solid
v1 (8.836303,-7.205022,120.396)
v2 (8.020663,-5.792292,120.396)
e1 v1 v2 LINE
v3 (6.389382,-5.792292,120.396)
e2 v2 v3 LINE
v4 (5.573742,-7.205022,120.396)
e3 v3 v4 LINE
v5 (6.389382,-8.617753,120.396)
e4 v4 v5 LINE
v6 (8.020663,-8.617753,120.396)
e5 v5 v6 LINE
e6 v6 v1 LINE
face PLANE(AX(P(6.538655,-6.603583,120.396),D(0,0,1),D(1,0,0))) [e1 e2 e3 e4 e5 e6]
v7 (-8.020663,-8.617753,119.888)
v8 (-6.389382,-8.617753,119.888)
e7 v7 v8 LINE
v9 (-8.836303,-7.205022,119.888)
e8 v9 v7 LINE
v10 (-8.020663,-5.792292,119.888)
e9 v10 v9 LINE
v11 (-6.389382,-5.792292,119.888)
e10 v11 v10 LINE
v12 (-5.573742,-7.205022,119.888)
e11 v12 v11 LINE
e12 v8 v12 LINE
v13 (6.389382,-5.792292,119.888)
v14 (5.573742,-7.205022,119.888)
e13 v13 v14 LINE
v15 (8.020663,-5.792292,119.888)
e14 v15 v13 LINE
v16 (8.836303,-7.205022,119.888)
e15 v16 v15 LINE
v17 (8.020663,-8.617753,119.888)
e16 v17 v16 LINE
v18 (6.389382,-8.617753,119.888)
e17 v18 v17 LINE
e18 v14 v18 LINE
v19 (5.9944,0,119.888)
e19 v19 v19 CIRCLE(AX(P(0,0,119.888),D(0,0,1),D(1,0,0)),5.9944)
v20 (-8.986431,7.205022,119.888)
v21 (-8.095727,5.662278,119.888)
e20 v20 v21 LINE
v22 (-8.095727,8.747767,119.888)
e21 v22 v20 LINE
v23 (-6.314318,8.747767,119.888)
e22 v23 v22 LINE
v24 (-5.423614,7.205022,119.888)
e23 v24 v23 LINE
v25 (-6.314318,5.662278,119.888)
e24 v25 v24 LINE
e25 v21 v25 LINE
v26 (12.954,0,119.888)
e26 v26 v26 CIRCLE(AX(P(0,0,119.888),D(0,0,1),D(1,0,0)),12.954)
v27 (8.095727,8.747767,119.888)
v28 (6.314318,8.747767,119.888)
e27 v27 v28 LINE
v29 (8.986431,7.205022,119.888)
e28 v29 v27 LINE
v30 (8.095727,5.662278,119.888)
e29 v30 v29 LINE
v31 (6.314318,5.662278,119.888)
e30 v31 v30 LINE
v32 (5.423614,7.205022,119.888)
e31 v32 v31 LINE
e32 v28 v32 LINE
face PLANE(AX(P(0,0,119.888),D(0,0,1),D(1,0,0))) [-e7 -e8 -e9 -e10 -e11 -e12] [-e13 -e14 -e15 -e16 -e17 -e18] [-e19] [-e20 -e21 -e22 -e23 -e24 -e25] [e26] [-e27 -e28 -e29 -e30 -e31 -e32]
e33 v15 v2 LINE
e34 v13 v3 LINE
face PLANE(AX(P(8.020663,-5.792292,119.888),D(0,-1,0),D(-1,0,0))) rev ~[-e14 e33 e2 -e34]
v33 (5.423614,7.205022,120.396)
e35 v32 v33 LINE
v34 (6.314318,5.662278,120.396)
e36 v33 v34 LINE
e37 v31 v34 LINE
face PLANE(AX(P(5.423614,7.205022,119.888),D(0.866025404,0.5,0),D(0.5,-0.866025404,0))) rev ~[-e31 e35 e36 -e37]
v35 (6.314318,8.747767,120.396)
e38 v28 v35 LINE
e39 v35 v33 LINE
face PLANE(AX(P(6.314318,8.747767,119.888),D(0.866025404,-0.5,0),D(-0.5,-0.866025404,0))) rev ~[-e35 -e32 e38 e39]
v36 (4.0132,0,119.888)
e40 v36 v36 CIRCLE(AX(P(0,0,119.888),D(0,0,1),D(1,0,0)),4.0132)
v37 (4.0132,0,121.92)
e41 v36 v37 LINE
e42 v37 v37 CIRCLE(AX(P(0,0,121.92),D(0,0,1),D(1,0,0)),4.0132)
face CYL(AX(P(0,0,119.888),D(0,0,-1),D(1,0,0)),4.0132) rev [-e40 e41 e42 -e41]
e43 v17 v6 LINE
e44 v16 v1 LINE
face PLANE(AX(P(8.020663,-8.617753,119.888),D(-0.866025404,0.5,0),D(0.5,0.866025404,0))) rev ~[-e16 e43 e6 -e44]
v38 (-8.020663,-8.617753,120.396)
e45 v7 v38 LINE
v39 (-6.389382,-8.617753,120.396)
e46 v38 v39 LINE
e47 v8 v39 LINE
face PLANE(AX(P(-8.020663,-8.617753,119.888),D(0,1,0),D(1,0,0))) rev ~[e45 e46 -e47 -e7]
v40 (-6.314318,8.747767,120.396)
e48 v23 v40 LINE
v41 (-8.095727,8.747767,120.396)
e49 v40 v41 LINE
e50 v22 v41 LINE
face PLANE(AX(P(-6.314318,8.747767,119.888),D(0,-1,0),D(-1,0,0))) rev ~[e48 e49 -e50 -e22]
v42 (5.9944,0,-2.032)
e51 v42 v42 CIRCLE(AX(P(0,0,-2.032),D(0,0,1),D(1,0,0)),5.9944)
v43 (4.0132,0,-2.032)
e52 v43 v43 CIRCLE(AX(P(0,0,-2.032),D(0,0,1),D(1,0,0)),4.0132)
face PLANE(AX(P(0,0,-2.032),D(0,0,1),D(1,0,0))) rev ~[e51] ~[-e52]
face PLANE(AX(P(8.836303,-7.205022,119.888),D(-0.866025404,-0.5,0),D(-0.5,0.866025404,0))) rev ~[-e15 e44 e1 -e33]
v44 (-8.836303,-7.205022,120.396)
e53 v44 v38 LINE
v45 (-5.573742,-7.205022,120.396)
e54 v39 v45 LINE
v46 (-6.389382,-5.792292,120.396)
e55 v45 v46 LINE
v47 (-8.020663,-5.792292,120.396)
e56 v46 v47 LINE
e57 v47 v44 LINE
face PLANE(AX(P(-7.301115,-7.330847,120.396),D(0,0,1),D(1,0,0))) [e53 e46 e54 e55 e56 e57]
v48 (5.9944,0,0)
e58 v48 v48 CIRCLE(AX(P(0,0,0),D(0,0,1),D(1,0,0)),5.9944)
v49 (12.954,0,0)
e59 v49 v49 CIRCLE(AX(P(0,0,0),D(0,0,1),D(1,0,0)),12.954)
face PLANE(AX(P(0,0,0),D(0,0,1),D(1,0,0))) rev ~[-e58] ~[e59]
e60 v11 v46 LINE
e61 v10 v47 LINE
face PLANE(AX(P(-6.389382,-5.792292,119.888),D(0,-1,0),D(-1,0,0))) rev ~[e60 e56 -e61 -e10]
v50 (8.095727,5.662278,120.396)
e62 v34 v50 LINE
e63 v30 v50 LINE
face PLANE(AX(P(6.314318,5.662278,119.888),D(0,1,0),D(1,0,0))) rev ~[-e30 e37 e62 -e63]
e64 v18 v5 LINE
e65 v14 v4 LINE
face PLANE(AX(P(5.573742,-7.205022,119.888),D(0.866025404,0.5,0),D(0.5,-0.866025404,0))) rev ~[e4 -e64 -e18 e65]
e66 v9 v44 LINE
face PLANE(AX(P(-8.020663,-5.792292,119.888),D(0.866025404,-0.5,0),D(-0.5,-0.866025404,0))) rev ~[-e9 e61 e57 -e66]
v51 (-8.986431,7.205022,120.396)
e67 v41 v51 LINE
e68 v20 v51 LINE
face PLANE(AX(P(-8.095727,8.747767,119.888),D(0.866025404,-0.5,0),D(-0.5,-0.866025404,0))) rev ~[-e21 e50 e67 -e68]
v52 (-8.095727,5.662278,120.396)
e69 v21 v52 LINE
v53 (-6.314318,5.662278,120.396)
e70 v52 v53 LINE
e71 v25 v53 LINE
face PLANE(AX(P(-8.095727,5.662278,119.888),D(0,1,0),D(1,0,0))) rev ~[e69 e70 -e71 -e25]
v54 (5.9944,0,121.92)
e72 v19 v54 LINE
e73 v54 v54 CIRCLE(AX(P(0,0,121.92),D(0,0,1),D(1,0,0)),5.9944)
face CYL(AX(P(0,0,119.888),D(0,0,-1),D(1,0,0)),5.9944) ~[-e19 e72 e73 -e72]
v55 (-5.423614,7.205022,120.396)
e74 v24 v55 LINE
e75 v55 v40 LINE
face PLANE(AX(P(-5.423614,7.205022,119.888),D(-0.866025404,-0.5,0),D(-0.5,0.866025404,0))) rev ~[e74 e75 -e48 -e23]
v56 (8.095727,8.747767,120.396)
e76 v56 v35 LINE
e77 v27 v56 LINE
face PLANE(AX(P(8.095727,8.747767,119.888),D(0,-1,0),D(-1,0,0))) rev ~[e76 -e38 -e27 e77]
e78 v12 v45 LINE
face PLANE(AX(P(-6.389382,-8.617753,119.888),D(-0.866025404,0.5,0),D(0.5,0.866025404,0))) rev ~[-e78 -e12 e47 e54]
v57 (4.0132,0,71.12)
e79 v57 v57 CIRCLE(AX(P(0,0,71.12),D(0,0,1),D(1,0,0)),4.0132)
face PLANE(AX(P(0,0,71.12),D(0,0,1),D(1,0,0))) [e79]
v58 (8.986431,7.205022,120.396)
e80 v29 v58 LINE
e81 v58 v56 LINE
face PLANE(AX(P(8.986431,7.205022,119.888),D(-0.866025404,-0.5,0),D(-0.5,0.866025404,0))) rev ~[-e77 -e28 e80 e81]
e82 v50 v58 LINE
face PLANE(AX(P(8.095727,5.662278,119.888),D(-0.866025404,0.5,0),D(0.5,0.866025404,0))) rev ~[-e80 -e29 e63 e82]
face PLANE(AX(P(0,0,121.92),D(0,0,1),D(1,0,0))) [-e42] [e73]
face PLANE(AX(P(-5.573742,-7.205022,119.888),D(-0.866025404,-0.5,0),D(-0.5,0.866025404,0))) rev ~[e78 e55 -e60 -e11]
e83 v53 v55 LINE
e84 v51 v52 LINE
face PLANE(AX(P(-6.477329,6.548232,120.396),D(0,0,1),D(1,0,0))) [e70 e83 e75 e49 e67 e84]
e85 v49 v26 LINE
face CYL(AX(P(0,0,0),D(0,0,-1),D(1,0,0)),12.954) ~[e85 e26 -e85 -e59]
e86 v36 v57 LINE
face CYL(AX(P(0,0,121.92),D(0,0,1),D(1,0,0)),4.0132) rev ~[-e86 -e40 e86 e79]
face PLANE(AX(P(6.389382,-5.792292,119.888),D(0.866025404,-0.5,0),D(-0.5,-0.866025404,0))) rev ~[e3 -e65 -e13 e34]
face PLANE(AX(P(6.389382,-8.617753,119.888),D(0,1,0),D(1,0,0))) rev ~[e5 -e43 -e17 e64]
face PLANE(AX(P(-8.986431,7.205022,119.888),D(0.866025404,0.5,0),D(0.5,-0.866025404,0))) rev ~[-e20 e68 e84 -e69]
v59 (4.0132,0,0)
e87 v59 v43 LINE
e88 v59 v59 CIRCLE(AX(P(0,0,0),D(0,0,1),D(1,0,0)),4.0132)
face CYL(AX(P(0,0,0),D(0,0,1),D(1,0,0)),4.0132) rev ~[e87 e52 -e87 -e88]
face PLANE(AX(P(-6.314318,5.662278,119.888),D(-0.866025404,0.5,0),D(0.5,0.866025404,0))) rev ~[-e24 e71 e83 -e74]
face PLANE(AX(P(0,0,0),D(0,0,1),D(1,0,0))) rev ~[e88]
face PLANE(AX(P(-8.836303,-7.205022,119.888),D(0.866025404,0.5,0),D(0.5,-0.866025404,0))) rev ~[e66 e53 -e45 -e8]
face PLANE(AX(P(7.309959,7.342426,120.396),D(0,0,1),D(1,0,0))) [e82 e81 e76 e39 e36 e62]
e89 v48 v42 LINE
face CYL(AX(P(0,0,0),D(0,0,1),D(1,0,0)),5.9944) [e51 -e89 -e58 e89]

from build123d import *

# Parameters (mm, degrees)
F0_R      = 12.954
F0_R_2    = 5.9944
F0_R_3    = 4.0132
F1_DEPTH  = 119.888
F2_R      = 5.9944
F2_R_2    = 4.0132
F3_DEPTH  = 2.032
F5_R      = 5.9944
F5_R_2    = 4.0132
F6_DEPTH  = 2.032
F7_R      = 4.0132
F8_DEPTH  = 50.8
F10_DEPTH = 0.508


# Not quite as in the source:
# - the program builds the solid bodies; features that only make, move or delete a surface that nothing else refers to are left out


with BuildPart() as f1:
    # F0 (on Top) → F1 (new body)
    with BuildSketch(Plane.XY):
        Circle(F0_R)
        Circle(F0_R_2, mode=Mode.SUBTRACT)
        Circle(F0_R_2)
        Circle(F0_R_3, mode=Mode.SUBTRACT)
        Circle(F0_R_3)
    extrude(amount=F1_DEPTH)

    # F2 (on face) → F3 (join)
    with BuildSketch(Plane.XY.offset(119.888)):
        Circle(F2_R)
        Circle(F2_R_2, mode=Mode.SUBTRACT)
    extrude(amount=F3_DEPTH)

    # F5 (on face) + F0 (on Top) → F6 (join)
    with BuildSketch(Plane.XY):
        Circle(F5_R)
        Circle(F5_R_2, mode=Mode.SUBTRACT)
    with BuildSketch(Plane.XY):
        Circle(F0_R_2)
        Circle(F0_R_3, mode=Mode.SUBTRACT)
    extrude(amount=-F6_DEPTH)

    # F7 (on face) → F8 (cut)
    with BuildSketch(Plane.XY.offset(121.92)):
        Circle(F7_R)
    extrude(amount=-F8_DEPTH, mode=Mode.SUBTRACT)

    # F9 (on face) → F10 (join)
    with BuildSketch(Plane.XY.offset(119.888)):
        Polygon((5.5737421783, -7.205022499), (7.205022499, -7.205022499), (7.205022499, -5.7922923006), (6.3893823387, -5.7922923006), align=None)
        Polygon((7.205022499, -5.7922923006), (7.205022499, -7.205022499), (5.5737421783, -7.205022499), (6.3893823387, -8.6177526973), (8.0206626593, -8.6177526973), (8.8363028196, -7.205022499), (8.0206626593, -5.7922923006), align=None)
        Polygon((-6.3893823387, -8.6177526973), (-5.5737421783, -7.205022499), (-7.205022499, -7.205022499), (-7.205022499, -5.7922923006), (-8.0206626593, -5.7922923006), (-8.8363028196, -7.205022499), (-8.0206626593, -8.6177526973), align=None)
        Polygon((-7.205022499, -7.205022499), (-5.5737421783, -7.205022499), (-6.3893823387, -5.7922923006), (-7.205022499, -5.7922923006), align=None)
        Polygon((-7.205022499, 7.205022499), (-7.205022499, 5.6622778066), (-6.3143184355, 5.6622778066), (-5.4236143721, 7.205022499), align=None)
        Polygon((-8.0957265624, 5.6622778066), (-7.205022499, 5.6622778066), (-7.205022499, 7.205022499), (-5.4236143721, 7.205022499), (-6.3143184355, 8.7477671914), (-8.0957265624, 8.7477671914), (-8.9864306259, 7.205022499), align=None)
        Polygon((7.205022499, 7.205022499), (7.205022499, 5.6622778066), (8.0957265624, 5.6622778066), (8.9864306259, 7.205022499), (8.0957265624, 8.7477671914), (6.3143184355, 8.7477671914), (5.4236143721, 7.205022499), align=None)
        Polygon((6.3143184355, 5.6622778066), (7.205022499, 5.6622778066), (7.205022499, 7.205022499), (5.4236143721, 7.205022499), align=None)
    extrude(amount=F10_DEPTH)


solid = f1.part
